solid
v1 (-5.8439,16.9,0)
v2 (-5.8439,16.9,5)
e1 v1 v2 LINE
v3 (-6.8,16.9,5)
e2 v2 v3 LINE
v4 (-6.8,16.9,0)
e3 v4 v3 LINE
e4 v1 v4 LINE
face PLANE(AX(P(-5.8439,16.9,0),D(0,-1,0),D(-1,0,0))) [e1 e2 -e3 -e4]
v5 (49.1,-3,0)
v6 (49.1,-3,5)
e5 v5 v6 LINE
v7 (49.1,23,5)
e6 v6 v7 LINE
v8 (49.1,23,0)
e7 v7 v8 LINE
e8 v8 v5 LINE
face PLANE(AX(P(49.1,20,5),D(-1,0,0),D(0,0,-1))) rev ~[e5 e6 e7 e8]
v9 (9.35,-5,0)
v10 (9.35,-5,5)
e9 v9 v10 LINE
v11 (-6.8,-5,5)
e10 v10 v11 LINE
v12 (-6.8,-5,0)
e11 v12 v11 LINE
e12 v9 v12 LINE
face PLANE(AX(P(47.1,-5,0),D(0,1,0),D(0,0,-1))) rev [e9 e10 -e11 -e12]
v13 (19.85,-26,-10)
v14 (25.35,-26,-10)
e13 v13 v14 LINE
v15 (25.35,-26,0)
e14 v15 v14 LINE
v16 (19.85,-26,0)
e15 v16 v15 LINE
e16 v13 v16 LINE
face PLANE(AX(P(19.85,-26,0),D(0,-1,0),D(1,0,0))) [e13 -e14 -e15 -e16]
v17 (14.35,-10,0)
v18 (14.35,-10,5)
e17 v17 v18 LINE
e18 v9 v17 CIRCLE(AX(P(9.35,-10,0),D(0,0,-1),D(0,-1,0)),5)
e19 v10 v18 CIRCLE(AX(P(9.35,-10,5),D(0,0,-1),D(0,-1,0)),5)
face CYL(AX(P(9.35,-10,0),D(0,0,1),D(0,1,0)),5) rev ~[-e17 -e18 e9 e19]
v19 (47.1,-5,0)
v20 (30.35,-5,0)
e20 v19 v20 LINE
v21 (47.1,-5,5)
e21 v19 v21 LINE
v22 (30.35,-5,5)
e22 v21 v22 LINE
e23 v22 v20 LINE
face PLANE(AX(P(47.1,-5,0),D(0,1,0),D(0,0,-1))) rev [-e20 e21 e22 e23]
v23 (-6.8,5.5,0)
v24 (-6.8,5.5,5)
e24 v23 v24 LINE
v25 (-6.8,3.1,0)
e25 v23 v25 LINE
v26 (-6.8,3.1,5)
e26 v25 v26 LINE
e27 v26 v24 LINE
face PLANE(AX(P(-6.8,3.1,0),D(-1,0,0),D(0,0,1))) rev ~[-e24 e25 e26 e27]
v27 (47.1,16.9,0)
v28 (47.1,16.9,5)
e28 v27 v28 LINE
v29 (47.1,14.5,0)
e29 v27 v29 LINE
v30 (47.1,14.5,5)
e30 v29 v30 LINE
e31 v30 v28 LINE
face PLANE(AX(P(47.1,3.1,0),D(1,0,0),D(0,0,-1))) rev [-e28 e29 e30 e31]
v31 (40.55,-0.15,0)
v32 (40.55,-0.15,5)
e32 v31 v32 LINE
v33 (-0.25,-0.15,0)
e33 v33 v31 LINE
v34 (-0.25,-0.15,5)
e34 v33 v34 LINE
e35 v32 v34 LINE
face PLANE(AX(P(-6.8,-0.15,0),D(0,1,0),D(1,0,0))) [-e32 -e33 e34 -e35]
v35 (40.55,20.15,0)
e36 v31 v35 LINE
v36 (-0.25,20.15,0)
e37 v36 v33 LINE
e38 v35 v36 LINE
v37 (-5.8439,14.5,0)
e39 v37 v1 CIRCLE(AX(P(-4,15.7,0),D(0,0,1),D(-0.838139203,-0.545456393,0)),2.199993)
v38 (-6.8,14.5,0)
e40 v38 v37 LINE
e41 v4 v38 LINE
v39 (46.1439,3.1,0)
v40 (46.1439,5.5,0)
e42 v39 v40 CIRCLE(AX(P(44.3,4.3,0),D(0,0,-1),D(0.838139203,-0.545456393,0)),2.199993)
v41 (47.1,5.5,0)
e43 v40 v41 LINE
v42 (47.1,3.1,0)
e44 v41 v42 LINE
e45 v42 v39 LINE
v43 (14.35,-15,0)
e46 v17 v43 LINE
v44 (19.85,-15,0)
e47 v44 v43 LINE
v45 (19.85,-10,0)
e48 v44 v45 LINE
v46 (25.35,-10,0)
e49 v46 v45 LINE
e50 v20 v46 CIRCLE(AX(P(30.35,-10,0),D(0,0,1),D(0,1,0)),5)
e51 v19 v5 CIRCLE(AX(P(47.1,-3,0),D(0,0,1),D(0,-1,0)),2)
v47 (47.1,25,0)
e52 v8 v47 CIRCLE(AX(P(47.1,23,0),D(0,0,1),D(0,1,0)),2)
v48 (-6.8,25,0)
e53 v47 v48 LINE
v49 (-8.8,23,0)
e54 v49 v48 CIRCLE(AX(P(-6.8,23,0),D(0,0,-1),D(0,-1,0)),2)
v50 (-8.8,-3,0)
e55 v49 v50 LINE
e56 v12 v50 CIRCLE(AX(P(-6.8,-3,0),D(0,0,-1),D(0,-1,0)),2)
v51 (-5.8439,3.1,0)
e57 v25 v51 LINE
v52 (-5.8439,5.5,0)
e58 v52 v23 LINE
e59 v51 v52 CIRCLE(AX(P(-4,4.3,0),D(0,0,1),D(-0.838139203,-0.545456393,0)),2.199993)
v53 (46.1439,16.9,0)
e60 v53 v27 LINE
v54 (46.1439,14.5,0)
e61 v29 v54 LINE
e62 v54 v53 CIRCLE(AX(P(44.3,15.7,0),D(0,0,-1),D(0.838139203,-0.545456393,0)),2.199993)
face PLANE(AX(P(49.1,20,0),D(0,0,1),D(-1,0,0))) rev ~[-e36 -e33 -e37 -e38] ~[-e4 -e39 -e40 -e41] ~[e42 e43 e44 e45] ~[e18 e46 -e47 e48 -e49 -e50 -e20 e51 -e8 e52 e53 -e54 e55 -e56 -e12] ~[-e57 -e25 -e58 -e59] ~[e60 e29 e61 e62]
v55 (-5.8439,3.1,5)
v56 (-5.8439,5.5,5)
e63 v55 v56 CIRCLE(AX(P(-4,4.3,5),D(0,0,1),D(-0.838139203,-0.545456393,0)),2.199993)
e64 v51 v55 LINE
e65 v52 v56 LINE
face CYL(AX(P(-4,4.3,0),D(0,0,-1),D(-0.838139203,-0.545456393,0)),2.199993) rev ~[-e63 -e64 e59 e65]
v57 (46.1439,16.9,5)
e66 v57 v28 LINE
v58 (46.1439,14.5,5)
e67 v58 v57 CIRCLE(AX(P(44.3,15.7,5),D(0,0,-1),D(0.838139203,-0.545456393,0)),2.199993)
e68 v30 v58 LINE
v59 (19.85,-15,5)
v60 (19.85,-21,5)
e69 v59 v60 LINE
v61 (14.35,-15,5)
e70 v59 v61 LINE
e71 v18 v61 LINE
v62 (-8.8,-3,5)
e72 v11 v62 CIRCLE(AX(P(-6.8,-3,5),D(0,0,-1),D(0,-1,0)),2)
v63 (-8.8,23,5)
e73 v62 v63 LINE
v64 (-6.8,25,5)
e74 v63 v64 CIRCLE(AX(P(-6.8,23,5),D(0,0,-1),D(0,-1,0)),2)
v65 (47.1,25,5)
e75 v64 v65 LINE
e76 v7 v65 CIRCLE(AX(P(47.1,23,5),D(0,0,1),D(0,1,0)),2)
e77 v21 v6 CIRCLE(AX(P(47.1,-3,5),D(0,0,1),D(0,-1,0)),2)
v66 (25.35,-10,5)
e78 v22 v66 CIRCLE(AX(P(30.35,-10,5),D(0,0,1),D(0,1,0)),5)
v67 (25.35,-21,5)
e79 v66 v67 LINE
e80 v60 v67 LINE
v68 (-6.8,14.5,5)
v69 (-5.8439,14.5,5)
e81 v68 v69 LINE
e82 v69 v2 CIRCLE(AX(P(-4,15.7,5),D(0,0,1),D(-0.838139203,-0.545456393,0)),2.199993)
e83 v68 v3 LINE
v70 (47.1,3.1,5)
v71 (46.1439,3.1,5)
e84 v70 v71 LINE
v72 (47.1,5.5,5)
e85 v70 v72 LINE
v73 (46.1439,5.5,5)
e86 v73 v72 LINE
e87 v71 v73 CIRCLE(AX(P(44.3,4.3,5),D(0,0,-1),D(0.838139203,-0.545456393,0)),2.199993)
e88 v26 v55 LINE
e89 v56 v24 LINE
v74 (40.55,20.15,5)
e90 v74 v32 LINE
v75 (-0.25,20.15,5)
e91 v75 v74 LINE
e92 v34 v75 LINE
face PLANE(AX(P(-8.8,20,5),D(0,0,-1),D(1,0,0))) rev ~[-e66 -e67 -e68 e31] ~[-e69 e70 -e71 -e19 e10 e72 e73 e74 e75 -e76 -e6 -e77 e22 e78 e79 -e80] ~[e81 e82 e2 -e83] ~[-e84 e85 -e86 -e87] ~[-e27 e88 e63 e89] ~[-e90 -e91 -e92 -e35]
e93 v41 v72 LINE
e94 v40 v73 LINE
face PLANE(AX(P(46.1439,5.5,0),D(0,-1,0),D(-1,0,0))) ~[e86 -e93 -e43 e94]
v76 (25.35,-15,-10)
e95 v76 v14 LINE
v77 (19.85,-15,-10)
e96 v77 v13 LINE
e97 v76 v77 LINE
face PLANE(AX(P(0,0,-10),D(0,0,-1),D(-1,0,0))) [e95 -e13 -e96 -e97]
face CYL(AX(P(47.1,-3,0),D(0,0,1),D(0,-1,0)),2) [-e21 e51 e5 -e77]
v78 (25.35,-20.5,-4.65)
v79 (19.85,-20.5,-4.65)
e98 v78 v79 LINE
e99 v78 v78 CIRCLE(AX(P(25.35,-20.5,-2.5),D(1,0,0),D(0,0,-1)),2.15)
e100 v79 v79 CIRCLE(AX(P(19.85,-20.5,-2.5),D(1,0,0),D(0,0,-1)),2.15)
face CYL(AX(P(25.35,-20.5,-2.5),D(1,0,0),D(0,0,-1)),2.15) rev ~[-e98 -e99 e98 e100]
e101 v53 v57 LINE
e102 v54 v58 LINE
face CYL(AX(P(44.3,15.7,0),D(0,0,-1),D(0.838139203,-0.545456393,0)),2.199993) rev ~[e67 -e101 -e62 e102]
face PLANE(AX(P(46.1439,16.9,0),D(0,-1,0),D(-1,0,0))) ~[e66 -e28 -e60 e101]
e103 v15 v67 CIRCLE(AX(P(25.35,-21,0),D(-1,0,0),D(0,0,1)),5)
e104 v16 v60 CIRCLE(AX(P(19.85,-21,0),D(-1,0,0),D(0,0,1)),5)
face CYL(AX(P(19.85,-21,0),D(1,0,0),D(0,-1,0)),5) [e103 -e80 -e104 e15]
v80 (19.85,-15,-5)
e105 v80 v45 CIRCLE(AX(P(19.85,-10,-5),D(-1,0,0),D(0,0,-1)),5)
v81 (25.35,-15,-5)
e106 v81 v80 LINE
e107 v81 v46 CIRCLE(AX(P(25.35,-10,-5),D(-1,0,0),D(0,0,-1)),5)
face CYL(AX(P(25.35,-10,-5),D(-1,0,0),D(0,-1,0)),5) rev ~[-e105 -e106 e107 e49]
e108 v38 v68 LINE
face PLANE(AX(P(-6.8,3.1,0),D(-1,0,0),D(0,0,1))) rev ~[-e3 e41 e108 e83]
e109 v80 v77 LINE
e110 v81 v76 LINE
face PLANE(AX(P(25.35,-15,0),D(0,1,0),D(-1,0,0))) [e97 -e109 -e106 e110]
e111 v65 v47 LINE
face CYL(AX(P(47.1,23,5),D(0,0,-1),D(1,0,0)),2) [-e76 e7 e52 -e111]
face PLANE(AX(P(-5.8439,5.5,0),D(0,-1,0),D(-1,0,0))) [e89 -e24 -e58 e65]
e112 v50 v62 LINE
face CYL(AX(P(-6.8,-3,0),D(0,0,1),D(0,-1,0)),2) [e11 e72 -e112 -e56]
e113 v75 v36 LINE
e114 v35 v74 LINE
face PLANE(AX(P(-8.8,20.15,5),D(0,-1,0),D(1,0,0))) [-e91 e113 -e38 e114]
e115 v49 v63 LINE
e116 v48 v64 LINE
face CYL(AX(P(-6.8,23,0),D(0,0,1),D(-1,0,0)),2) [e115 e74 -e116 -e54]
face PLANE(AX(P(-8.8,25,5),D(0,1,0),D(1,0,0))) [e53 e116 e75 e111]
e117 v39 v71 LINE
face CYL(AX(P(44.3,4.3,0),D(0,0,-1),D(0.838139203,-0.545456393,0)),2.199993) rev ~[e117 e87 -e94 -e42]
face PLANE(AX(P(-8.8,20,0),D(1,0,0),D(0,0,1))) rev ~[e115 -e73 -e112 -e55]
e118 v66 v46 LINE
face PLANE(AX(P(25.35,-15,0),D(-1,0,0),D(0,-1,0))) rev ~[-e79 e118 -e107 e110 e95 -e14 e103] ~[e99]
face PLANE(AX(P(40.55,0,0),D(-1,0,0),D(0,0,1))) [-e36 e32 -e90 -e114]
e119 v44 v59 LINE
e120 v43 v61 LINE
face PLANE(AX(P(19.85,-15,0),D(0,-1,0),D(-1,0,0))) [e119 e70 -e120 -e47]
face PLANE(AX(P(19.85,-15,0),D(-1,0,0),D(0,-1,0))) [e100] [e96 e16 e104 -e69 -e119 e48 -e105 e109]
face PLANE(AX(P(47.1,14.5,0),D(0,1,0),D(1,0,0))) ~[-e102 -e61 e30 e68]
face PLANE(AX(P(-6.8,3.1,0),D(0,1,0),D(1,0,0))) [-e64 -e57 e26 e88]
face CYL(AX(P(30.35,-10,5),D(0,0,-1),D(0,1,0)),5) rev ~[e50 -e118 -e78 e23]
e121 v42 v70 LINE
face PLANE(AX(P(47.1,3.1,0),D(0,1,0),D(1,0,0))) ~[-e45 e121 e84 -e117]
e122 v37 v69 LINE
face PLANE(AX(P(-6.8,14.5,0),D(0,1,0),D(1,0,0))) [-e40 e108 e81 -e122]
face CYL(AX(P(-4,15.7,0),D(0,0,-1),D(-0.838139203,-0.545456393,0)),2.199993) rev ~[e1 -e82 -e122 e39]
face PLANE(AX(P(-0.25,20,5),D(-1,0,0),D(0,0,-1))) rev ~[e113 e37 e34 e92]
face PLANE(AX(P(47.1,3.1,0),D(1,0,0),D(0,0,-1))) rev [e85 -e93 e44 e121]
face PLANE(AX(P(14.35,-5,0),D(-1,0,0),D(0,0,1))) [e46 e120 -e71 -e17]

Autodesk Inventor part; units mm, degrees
ref_plane "YZ Plane" through (0, 0, 0) normal (1, 0, 0) x (0, 1, 0)
ref_plane "XZ Plane" through (0, 0, 0) normal (0, 1, 0) x (-1, 0, 0)
sketch "Sketch1" plane through (0, 0, 0) normal (0, 0, 1) x (1, 0, 0)
  line L0 (0, 0) -> (-6.8, 0)
  line L1 (-6.8, 0) -> (-6.8, 20)
  line L2 (-6.8, 20) -> (0, 20)
  line L3 (0, 20) -> (0, 0)
  line L4 (-5.8439, 5.5) -> (-6.8, 5.5) projected
  line L5 (-6.8, 14.5) -> (-6.8, 5.5) projected
  line L6 (-6.8, 14.5) -> (-5.8439, 14.5) projected
  arc A0 (-5.8439, 14.5) -> (-5.8439, 16.9) centre (-4, 15.7) ccw projected
  line L7 (-5.8439, 16.9) -> (-6.8, 16.9) projected
  line L8 (-6.8, 20) -> (-6.8, 16.9) projected
  line L9 (0, 20) -> (-6.8, 20) projected
  line L10 (0, 0) -> (0, 20) projected
  line L11 (0, 0) -> (-6.8, 0) projected
  line L12 (-6.8, 3.1) -> (-6.8, 0) projected
  line L13 (-6.8, 3.1) -> (-5.8439, 3.1) projected
  arc A1 (-5.8439, 3.1) -> (-5.8439, 5.5) centre (-4, 4.3) ccw projected
  dimension "d0" = 6.8
  dimension "d1" = 20
extrude "Extrusion1" add sketch "Sketch1" along normal blind 5 contours L0 L1 L13 A1 L4 L6 A0 L7 L2 L3
ref_plane "Work Plane1" through (20.15, 10, -1.65) normal (-1, 0, 0) x (0, 1, 0)
mirror "Mirror1" about plane through (20.15, 10, -1.65) normal (-1, 0, 0) of "Extrusion1"
sketch "Sketch2" plane through (-6.8, 0, 0) normal (0, -1, 0) x (1, 0, 0)
  line L0 (0, 0) -> (53.9, 0)
  line L1 (53.9, 0) -> (53.9, 5)
  line L2 (53.9, 5) -> (0, 5)
  line L3 (0, 5) -> (0, 0)
  dimension "d4" = 53.9
extrude "Extrusion2" add sketch "Sketch2" along normal blind 5
sketch "Sketch3" plane through (-6.8, 3.1, 0) normal (-1, 0, 0) x (0, 0, 1)
  line L0 (0, -8.1) -> (5, -8.1)
  line L1 (5, -8.1) -> (5, 16.9)
  line L2 (5, 16.9) -> (0, 16.9)
  line L3 (0, 16.9) -> (0, -8.1)
  point P0 (0, -3.1)
  dimension "d7" = 25
extrude "Extrusion3" add sketch "Sketch3" along normal blind 2
mirror "Mirror2" about plane through (20.15, 10, -1.65) normal (-1, 0, 0) of "Extrusion3"
fillet "Fillet1" radius 2 1 edges at (-8.8, -5, 2.5)
fillet "Fillet2" radius 2 1 edges at (49.1, -5, 2.5)
sketch "Sketch4" plane through (0, 20, 5) normal (1, 0, 0) x (0, 0, -1)
  line L0 (5, -20) -> (5, 0) projected
  line L1 (5, 0) -> (0, 0) projected
  line L2 (0, -20) -> (0, 0) projected
  line L3 (5, -20) -> (0, -20) projected
extrude "Extrusion4" cut sketch "Sketch4" against normal blind 0.25
mirror "Mirror3" about plane through (20.15, 10, -1.65) normal (-1, 0, 0) of "Extrusion4"
sketch "Sketch5" plane through (-8.8, 20, 5) normal (0, 1, 0) x (1, 0, 0)
  line L0 (0, 0) -> (57.9, 0)
  line L1 (57.9, 0) -> (57.9, 5)
  line L2 (57.9, 5) -> (0, 5)
  line L3 (0, 5) -> (0, 0)
  point P0 (8.8, 5)
  dimension "d14" = 57.9
extrude "Extrusion5" add sketch "Sketch5" along normal blind 5
sketch "Sketch6" plane through (-8.8, 20, 5) normal (0, -1, 0) x (1, 0, 0)
  line L0 (8.55, 0) -> (8.55, -5) projected
  line L1 (49.35, -5) -> (8.55, -5) projected
  line L2 (49.35, -5) -> (49.35, 0) projected
  line L3 (8.55, 0) -> (49.35, 0) projected
  point P0 (8.8, -5)
extrude "Extrusion6" cut sketch "Sketch6" against normal blind 0.15
sketch "Sketch7" plane through (-6.8, 0, 0) normal (0, 1, 0) x (1, 0, 0)
  line L0 (47.35, -5) -> (6.55, -5) projected
  line L1 (47.35, 0) -> (47.35, -5) projected
  line L2 (6.55, 0) -> (47.35, 0) projected
  line L3 (6.55, 0) -> (6.55, -5) projected
  point P0 (6.8, 0)
extrude "Extrusion7" cut sketch "Sketch7" against normal blind 0.15
sketch "Sketch9" plane through (-6.8, -5, 0) normal (0, -1, 0) x (1, 0, 0)
  line L0 (0, 5) -> (53.9, 5) projected
  line L1 (53.9, 0) -> (0, 0) projected
  line L2 (26.65, -10.0707) -> (26.65, 15.0707) construction
  line L3 (55.9, 0) -> (55.9, 5) construction
  line L4 (21.15, 5) -> (32.15, 5)
  line L5 (32.15, 5) -> (32.15, 0)
  line L6 (32.15, 0) -> (21.15, 0)
  line L7 (21.15, 0) -> (21.15, 5)
  point P0 (6.8, 0)
  dimension "d23" = 29.25
  dimension "d24" = 11
  dimension "d25" = 5.5
extrude "Extrusion9" add sketch "Sketch9" along normal blind 21
fillet "Fillet3" radius 5 2 edges at (14.35, -5, 2.5) (25.35, -5, 2.5)
sketch "Sketch10" plane through (0, 0, 0) normal (0, 0, -1) x (-1, 0, 0)
  line L0 (-47.1, -5) -> (-30.35, -5) projected
  line L1 (-14.35, -10) -> (-14.35, -26) projected
  line L2 (-25.35, -15) -> (-19.85, -15)
  line L3 (-19.85, -15) -> (-19.85, -26)
  line L4 (-19.85, -26) -> (-25.35, -26)
  line L5 (-25.35, -10) -> (-25.35, -26) projected
  line L6 (-9.35, -5) -> (6.8, -5) projected
  line L7 (-25.35, -15) -> (-25.35, -26)
  point P0 (0, 0)
  dimension "d30" = 11
  dimension "d31" = 10
  dimension "d32" = 5.5
extrude "Extrusion10" add sketch "Sketch10" along normal blind 10
fillet "Fillet7" radius 5 1 edges at (22.6, -15, 0)
sketch "Sketch11" plane through (0, 0, 0) normal (0, 0, -1) x (-1, 0, 0)
  line L0 (-19.85, -10) -> (-19.85, -26) projected
  line L1 (-14.35, -26) -> (-19.85, -26)
  line L2 (-19.85, -26) -> (-19.85, -15)
  line L3 (-19.85, -15) -> (-14.35, -15)
  line L4 (-14.35, -15) -> (-14.35, -26)
  point P0 (0, 0)
  dimension "d39" = 11
extrude "Extrusion11" cut sketch "Sketch11" against normal blind 10
sketch "Sketch12" plane through (25.35, -26, 5) normal (1, 0, 0) x (0, 0, -1)
  line L0 (15, 11) -> (15, 0) projected
  circle A0 centre (7.5, 5.5) radius 2.15
  point P0 (5, 26)
  dimension "d42" = 4.3
  dimension "d43" = 7.5
extrude "Extrusion12" cut sketch "Sketch12" against normal blind 10
fillet "Fillet8" radius 5 1 edges at (22.6, -26, 5)
sketch "Sketch14" plane through (20.15, 10, -1.65) normal (1, 0, 0) x (0, 1, 0)
  point P0 (-10, -1.65)
fillet "Fillet9" radius 2 2 edges at (49.1, 25, 2.5) (-8.8, 25, 2.5)
ref_plane "Work Plane2" through (20.15, 10, -1.65) normal (-1, 0, 0) x (0, 1, 0)
properties part number "TopBar"
